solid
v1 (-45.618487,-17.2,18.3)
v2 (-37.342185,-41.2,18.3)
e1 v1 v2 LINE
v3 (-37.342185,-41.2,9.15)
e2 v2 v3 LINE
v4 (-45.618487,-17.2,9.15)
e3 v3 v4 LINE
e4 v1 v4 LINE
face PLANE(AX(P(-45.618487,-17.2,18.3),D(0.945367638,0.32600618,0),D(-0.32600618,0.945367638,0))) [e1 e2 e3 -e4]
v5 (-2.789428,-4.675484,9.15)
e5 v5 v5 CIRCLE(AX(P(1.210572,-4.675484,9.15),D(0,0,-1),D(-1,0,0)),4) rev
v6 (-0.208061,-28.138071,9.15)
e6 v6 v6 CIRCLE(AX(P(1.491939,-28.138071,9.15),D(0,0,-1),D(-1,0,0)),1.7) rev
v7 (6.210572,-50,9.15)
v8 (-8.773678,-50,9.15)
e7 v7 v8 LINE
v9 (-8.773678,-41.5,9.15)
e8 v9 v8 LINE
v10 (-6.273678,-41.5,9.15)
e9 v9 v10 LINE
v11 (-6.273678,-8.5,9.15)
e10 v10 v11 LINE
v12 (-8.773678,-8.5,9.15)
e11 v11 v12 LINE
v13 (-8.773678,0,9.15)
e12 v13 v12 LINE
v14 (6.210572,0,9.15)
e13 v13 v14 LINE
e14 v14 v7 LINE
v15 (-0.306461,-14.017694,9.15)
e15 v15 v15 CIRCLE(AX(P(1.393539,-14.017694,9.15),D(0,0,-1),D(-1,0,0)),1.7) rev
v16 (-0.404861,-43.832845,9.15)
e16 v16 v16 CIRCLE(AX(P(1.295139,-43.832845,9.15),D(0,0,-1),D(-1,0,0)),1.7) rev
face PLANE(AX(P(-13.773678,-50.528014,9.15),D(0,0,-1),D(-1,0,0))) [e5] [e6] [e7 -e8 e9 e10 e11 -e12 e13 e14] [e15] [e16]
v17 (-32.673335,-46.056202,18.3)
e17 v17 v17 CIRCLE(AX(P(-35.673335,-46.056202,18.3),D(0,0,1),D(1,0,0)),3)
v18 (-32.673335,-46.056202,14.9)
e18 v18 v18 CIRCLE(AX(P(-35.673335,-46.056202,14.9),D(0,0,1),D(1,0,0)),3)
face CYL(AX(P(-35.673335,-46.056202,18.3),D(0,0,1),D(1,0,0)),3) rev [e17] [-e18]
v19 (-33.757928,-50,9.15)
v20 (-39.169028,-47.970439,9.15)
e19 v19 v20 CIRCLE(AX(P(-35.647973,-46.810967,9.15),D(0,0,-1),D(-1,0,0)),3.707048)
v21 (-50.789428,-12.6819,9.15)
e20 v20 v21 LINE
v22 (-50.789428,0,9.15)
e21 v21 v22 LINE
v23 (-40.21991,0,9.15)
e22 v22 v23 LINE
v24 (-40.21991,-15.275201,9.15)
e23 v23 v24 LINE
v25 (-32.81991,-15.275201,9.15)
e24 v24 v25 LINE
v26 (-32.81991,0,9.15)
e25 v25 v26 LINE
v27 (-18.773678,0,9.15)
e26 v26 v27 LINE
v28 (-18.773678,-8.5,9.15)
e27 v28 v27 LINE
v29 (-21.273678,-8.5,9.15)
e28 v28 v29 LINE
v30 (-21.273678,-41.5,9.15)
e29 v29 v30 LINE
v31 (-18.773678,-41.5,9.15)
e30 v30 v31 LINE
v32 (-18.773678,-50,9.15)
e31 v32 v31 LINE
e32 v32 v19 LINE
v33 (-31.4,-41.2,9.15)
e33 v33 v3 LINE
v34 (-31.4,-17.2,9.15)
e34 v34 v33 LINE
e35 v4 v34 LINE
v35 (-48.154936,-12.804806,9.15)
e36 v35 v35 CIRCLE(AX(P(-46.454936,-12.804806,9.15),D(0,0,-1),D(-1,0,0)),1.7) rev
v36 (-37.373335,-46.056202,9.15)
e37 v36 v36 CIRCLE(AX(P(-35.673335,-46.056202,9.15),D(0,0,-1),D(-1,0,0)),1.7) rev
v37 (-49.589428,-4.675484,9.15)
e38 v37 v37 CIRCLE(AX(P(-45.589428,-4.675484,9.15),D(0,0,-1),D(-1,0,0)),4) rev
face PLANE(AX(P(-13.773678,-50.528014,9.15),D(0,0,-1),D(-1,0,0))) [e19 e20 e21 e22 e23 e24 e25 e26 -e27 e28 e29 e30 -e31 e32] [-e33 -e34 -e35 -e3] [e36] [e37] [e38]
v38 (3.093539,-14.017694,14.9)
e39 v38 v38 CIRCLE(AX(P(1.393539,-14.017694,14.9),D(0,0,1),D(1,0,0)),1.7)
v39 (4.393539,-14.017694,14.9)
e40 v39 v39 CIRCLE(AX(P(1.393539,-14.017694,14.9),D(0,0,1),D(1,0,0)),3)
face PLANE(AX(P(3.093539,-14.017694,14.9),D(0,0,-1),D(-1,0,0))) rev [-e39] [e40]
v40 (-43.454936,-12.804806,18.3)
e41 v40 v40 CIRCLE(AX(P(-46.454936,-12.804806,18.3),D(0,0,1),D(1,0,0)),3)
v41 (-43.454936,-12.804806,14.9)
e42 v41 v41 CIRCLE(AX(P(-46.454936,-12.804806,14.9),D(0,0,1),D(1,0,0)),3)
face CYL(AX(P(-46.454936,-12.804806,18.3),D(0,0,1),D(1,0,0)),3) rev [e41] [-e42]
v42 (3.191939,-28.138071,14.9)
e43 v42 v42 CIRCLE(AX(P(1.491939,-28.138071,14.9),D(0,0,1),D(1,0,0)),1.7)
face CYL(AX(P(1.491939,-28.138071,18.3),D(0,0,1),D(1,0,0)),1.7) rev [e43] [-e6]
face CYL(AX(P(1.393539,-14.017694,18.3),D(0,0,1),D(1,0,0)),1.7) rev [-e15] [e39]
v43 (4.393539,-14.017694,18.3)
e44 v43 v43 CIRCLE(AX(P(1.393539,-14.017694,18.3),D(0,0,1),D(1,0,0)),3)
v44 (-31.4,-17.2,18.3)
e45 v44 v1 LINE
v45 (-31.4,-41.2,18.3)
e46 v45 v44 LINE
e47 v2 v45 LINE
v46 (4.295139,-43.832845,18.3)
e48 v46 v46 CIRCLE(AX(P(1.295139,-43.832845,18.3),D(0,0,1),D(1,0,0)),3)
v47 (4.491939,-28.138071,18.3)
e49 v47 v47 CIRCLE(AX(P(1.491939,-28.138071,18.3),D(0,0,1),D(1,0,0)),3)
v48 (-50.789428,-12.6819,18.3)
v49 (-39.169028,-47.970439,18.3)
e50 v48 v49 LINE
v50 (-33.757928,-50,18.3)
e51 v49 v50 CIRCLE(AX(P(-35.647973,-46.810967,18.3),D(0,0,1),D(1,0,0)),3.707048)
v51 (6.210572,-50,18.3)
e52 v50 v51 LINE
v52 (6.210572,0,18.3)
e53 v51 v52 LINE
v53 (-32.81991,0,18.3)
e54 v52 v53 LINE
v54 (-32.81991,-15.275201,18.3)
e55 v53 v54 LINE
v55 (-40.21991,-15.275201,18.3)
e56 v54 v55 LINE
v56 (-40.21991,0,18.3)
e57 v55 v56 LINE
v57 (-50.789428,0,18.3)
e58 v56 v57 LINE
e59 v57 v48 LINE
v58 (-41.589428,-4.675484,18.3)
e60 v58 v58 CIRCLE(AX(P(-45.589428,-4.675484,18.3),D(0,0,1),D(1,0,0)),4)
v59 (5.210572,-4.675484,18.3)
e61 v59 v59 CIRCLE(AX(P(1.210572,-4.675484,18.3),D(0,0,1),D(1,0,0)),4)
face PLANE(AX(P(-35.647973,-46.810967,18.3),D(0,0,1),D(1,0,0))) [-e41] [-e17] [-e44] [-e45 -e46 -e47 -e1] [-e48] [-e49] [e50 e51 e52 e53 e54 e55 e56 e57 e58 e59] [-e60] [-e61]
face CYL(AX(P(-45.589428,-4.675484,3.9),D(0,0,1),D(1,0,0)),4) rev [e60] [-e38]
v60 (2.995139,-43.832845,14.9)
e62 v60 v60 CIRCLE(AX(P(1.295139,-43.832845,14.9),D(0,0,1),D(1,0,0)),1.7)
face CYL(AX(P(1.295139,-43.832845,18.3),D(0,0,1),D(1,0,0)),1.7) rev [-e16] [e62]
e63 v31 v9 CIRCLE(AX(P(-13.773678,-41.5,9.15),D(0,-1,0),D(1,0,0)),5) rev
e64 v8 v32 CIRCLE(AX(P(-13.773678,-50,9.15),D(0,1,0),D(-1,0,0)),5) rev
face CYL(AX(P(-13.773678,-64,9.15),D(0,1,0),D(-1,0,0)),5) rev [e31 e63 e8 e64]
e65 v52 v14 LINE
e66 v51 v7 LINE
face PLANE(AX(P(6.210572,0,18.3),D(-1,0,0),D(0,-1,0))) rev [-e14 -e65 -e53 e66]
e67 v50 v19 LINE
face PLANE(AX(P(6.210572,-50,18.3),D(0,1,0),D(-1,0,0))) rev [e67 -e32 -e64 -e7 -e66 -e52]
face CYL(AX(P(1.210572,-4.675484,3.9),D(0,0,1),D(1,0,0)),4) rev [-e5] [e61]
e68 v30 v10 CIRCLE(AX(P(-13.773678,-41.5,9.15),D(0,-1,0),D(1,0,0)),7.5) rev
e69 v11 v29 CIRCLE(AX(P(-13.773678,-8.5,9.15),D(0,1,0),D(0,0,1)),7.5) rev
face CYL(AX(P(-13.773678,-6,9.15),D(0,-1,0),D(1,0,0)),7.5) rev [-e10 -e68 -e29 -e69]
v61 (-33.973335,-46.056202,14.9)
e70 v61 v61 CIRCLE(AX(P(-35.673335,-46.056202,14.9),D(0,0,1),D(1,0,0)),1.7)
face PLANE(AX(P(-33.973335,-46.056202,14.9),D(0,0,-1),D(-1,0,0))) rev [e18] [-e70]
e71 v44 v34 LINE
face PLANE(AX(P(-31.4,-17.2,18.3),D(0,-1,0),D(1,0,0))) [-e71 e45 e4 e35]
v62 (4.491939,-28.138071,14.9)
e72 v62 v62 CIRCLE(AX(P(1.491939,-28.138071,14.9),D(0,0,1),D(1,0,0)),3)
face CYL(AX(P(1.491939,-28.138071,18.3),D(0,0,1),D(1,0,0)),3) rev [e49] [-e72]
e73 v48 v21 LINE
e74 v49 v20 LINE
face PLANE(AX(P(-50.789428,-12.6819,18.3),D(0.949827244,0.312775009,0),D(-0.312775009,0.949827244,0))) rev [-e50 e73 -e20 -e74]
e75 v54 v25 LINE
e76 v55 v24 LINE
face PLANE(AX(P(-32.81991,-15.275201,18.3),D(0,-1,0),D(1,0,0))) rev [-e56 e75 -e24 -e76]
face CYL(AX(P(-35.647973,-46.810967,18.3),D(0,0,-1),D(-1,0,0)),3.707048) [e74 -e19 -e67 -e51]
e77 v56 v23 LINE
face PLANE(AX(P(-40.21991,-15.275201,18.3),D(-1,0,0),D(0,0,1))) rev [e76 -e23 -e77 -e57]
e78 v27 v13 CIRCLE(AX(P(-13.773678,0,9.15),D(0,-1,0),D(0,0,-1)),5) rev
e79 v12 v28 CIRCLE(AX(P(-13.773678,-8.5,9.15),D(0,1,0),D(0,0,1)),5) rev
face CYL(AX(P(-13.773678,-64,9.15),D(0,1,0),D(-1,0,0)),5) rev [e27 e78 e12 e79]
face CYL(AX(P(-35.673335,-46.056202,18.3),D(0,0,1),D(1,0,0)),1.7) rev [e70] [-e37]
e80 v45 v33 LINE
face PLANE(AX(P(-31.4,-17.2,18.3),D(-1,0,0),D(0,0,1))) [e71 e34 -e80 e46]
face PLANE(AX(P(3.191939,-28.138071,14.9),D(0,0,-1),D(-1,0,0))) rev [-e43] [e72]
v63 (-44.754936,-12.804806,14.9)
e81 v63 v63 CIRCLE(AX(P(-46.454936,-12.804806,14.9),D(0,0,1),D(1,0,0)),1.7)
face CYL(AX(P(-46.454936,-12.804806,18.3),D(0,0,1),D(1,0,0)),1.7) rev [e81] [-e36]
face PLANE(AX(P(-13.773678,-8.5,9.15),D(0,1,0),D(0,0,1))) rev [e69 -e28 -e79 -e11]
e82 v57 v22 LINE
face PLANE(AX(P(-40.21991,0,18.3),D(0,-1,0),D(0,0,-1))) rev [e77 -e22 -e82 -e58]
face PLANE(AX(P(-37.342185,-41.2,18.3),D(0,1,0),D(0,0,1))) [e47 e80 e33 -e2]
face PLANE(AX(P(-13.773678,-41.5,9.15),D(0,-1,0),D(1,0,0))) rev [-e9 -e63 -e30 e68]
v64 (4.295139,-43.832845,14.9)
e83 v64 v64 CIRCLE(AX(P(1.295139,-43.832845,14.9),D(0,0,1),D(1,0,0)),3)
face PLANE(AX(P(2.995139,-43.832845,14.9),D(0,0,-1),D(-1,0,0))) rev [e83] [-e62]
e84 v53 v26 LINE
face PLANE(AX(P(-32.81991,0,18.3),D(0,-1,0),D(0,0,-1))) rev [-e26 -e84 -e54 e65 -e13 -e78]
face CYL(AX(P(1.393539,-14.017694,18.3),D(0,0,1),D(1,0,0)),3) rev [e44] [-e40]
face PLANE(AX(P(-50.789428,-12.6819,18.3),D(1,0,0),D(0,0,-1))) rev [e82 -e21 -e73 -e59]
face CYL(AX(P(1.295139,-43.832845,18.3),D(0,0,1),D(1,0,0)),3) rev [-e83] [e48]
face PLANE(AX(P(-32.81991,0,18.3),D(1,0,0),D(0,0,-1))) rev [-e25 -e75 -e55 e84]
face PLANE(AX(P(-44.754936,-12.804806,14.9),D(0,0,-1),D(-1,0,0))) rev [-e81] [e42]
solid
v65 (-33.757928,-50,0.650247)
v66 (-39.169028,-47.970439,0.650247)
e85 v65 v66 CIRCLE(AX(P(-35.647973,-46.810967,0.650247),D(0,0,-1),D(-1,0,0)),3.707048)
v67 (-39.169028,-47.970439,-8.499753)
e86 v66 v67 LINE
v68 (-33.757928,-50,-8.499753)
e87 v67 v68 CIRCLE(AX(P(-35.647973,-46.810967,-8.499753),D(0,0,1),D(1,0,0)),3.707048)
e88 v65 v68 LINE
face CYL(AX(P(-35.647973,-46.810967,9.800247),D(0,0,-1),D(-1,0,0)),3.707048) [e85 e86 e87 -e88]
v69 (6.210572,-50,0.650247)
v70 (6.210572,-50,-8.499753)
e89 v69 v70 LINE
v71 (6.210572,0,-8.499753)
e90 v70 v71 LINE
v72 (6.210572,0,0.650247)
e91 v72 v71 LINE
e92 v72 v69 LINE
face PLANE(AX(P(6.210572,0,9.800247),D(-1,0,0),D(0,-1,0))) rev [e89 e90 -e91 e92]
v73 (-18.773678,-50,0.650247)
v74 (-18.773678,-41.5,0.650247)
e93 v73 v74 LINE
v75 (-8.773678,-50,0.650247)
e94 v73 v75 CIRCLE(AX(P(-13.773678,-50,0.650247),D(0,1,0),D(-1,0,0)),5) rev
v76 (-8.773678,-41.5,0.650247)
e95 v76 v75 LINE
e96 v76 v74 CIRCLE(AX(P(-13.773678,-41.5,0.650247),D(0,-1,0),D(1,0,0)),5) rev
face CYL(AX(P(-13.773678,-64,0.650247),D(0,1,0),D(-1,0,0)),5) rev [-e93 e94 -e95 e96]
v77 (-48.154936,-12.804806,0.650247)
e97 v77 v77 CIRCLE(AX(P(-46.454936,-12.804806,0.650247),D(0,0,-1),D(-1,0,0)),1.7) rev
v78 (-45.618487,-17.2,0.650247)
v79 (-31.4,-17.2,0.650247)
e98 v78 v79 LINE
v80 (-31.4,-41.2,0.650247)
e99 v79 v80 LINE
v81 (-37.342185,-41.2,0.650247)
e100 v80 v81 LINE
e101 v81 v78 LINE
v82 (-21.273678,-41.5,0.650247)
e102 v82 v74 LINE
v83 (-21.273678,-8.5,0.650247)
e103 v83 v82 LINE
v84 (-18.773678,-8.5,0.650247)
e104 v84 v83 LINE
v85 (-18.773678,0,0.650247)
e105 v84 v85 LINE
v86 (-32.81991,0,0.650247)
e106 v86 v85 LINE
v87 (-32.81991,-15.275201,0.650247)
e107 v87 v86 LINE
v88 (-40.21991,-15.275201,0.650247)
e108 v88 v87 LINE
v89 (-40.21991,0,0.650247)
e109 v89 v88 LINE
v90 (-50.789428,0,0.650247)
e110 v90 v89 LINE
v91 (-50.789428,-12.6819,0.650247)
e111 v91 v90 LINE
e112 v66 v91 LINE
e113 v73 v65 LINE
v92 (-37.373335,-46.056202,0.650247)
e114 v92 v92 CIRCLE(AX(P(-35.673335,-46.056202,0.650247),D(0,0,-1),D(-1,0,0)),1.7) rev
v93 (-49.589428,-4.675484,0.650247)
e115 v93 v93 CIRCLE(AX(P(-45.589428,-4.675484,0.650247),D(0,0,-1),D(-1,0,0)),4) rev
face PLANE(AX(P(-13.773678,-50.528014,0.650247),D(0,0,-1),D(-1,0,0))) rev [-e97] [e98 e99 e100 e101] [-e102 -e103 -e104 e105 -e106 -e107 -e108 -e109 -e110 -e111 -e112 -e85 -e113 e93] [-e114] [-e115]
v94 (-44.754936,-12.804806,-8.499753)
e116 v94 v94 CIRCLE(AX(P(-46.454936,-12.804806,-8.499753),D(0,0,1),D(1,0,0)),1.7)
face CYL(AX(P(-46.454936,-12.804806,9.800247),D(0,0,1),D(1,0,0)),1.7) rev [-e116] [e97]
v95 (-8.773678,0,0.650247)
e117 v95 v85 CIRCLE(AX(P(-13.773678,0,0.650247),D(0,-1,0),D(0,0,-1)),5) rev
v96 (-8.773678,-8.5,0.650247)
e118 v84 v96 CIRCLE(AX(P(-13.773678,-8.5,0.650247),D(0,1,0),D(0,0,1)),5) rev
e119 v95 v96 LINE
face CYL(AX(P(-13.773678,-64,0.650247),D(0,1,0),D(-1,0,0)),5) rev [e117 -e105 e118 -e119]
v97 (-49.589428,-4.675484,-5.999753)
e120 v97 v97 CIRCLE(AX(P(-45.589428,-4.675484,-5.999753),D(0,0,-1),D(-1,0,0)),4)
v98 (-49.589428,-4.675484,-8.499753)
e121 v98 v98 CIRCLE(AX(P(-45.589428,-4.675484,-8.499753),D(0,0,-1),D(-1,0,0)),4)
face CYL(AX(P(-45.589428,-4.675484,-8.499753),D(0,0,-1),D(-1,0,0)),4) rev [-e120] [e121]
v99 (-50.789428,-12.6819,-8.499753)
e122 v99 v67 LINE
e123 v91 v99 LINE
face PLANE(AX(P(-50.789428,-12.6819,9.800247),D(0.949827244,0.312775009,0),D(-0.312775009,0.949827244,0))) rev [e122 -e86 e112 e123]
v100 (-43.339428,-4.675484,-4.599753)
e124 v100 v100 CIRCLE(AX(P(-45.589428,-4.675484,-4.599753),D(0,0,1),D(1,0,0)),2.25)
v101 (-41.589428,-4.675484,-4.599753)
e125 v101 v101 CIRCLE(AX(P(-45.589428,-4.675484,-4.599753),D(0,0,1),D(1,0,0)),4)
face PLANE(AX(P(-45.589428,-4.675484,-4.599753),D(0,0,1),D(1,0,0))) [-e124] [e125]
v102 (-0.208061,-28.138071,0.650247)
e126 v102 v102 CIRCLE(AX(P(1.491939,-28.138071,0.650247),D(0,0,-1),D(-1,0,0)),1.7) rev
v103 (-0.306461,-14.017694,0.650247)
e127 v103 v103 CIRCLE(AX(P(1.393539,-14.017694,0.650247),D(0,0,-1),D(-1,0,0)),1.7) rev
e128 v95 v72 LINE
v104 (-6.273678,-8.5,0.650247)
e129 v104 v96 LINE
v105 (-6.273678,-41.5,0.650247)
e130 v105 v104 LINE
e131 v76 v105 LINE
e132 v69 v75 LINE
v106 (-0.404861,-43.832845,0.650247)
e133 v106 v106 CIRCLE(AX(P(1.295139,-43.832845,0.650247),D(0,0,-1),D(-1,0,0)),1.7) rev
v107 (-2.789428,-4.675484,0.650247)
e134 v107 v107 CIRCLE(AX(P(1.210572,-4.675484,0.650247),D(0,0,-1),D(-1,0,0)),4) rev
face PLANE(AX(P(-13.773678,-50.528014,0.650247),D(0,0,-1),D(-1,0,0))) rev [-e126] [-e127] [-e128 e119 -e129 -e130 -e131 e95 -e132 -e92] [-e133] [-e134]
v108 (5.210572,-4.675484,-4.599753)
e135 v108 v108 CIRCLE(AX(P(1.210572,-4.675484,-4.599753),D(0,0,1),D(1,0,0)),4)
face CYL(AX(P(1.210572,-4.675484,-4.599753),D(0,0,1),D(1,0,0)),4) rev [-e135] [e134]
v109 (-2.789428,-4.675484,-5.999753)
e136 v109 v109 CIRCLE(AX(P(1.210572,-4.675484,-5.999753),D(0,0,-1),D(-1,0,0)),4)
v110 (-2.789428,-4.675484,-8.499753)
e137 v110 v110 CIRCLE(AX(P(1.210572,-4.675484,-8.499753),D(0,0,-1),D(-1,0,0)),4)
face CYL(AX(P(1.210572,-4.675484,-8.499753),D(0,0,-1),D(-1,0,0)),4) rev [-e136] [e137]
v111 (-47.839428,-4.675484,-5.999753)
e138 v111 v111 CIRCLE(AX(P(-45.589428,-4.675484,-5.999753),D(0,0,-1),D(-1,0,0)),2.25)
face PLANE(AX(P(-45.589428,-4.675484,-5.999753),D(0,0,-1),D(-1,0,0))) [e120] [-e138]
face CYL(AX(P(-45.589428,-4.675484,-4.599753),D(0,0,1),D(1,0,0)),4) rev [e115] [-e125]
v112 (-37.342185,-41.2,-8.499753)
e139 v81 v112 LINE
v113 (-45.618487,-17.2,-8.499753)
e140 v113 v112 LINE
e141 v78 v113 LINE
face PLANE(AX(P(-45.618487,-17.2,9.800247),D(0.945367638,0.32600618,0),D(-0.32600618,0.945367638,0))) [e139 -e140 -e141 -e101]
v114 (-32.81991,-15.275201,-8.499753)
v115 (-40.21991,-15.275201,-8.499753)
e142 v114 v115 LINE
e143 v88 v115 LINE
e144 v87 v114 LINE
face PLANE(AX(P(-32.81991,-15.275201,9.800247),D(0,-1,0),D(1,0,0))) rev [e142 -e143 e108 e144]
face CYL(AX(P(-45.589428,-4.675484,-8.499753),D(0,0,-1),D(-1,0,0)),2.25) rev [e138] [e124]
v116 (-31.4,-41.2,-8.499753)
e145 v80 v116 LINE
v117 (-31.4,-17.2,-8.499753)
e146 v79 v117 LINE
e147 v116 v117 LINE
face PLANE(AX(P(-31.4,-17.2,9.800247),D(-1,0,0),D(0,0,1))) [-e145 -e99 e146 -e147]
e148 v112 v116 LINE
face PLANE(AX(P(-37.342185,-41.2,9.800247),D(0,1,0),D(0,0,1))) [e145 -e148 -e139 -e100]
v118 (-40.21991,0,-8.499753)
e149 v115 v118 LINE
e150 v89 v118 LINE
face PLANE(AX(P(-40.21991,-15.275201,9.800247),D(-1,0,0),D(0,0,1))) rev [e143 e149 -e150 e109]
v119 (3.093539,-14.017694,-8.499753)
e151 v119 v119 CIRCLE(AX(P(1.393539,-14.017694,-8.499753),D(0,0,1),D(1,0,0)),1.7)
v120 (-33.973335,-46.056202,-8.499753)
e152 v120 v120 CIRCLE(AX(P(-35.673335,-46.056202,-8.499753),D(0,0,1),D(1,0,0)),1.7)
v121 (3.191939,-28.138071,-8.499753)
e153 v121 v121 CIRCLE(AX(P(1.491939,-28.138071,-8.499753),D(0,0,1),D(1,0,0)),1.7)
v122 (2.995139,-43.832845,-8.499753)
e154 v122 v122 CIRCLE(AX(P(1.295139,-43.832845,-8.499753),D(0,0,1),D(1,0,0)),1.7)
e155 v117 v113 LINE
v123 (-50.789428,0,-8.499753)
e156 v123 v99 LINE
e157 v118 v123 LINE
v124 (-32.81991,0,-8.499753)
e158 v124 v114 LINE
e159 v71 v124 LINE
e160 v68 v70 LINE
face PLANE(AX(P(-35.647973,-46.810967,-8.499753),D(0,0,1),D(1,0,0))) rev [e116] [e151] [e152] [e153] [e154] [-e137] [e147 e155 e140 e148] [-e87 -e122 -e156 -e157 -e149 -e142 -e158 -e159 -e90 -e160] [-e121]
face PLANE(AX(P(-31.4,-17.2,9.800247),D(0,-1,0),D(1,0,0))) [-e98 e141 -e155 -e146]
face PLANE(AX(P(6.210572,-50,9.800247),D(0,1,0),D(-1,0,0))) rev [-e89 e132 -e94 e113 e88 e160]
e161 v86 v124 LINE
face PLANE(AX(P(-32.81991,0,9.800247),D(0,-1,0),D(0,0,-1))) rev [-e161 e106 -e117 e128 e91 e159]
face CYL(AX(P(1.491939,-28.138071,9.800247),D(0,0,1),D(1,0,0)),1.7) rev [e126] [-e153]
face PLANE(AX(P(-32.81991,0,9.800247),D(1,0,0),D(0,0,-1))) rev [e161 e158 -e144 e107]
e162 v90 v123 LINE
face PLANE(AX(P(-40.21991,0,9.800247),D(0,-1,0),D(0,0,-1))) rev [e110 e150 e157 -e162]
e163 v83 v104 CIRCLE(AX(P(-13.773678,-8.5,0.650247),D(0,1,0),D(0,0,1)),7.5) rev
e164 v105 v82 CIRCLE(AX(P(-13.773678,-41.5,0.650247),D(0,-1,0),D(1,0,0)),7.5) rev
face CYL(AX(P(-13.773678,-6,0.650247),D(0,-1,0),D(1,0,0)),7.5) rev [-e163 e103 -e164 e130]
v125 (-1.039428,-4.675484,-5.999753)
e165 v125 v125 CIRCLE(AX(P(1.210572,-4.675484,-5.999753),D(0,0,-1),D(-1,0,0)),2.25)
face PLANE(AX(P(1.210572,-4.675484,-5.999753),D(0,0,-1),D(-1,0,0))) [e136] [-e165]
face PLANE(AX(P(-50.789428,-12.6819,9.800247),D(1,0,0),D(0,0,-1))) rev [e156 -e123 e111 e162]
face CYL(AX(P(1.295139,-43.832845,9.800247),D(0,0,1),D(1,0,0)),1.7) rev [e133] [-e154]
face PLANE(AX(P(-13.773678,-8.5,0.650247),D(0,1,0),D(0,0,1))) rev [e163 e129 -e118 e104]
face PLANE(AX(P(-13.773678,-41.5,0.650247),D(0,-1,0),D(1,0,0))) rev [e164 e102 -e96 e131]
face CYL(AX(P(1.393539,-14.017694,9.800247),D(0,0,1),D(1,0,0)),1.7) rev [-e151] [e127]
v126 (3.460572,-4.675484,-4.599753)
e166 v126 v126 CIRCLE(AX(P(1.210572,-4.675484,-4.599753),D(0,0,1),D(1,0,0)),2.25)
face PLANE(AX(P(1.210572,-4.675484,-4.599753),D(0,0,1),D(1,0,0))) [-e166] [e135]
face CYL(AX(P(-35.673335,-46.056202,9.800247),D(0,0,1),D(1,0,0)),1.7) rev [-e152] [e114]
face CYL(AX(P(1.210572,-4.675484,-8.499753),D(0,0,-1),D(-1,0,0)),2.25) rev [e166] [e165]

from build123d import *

# Parameters (mm, degrees)
EXTRUDE_1_DEPTH                = 18.3
HOLE_WIZARD_M4_9_OUTLINE_R     = 2.25
HOLE_WIZARD_M4_9_DEPTH         = 18.3
HOLE_WIZARD_M4_9_2_OUTLINE_R   = 4
HOLE_WIZARD_M4_9_2_OUTLINE_R_2 = 2.25
HOLE_WIZARD_M4_9_2_DEPTH       = 4.6
EXTRUDE_START                  = -14.8
SKETCH_10_R                    = 4
SKETCH_10_R_2                  = 2.25
EXTRUDE_3_DEPTH                = 14.8
EXTRUDE_START_2                = -14
SKETCH_10_3_R                  = 4
SKETCH_10_3_R_2                = 2.25
EXTRUDE_4_DEPTH                = 14
SKETCH_10_4_R                  = 4
SKETCH_10_4_R_2                = 2.25
EXTRUDE_5_DEPTH                = 14.4
EXTRUDE_5_2_DEPTH              = 14.4
EXTRUDE_START_3                = 1
SKETCH_12_R                    = 4
SKETCH_12_R_2                  = 2.25
EXTRUDE_6_DEPTH                = 1
HOLE_WIZARD_M3_1_D             = 3.4
HOLE_WIZARD_M3_1_CBORE_D       = 6
HOLE_WIZARD_M3_1_CBORE_DEPTH   = 3.4
SKETCH_15_R                    = 7.5
EXTRUDE_7_DEPTH                = 44
EXTRUDE_8_DEPTH                = 14
EXTRUDE_8_DEPTH_BACK           = 75
SKETCH_15_2_R                  = 7.5
SKETCH_15_3_R                  = 7.5
EXTRUDE_9_DEPTH                = 8.5
EXTRUDE_START_4                = -8.5
SKETCH_16_R                    = 7.5
EXTRUDE_10_DEPTH               = 8.5
EXTRUDE_11_DEPTH               = 14
EXTRUDE_11_DEPTH_BACK          = 67.5
SKETCH_17_R                    = 5
SPLIT_BODIES_1_SURFACE_1_BACK  = 79.332
SPLIT_BODIES_1_SURFACE_1_DEPTH = 158.664
SPLIT_BODIES_1_SURFACE_2_BACK  = 79.332
SPLIT_BODIES_1_SURFACE_2_DEPTH = 158.664


with BuildPart() as part:
    # 草图1 → 凸台-拉伸1 (new body)
    with BuildSketch(Plane.XY):
        with BuildLine():
            Line((0, -50), (-33.757928075, -50))
            ThreePointArc((-33.757928075, -50), (-36.949828603, -50.281899468), (-39.169027754, -47.970438583))
            Line((-39.169027754, -47.970438583), (-50.789428367, -12.681899647))
            Line((-50.789428367, -12.681899647), (-50.789428367, 0))
            Line((-50.789428367, 0), (-40.21990991, 0))
            Line((-40.21990991, 0), (-40.21990991, -15.275201138))
            Line((-40.21990991, -15.275201138), (-32.81990991, -15.275201138))
            Line((-32.81990991, -15.275201138), (-32.81990991, 0))
            Line((-32.81990991, 0), (0, 0))
            Line((0, 0), (6.210571633, 0))
            Line((6.210571633, 0), (6.210571633, -50))
            Line((6.210571633, -50), (0, -50))
        make_face()
        Polygon((-31.4, -17.2), (-31.4, -41.2), (-37.342185184, -41.2), (-45.618487459, -17.2), align=None, mode=Mode.SUBTRACT)
    extrude(amount=EXTRUDE_1_DEPTH)

    # M4 六角圆柱头螺钉的柱形沉头孔9: read off the stored shape, not the designer's step
    # M4 六角圆柱头螺钉的柱形沉头孔9 outline → M4 六角圆柱头螺钉的柱形沉头孔9 (cut)
    with BuildSketch(Plane.XY):
        with Locations((1.210571633, -4.675484087)):
            Circle(HOLE_WIZARD_M4_9_OUTLINE_R)
        with Locations((-45.589428367, -4.675484087)):
            Circle(HOLE_WIZARD_M4_9_OUTLINE_R)
    extrude(amount=HOLE_WIZARD_M4_9_DEPTH, mode=Mode.SUBTRACT)

    # Hole Wizard M4 _9 2 outline → Hole Wizard M4 _9 2 (cut)
    # profile 1 of 2: a face of its own
    with BuildSketch(Plane.XY):
        with Locations((1.210571633, -4.675484087)):
            Circle(HOLE_WIZARD_M4_9_2_OUTLINE_R)
        with Locations((1.210571633, -4.675484087)):
            Circle(HOLE_WIZARD_M4_9_2_OUTLINE_R_2, mode=Mode.SUBTRACT)
    # profile 2 of 2: a face of its own
    with BuildSketch(Plane.XY):
        with Locations((-45.589428367, -4.675484087)):
            Circle(HOLE_WIZARD_M4_9_2_OUTLINE_R)
        with Locations((-45.589428367, -4.675484087)):
            Circle(HOLE_WIZARD_M4_9_2_OUTLINE_R_2, mode=Mode.SUBTRACT)
    extrude(amount=HOLE_WIZARD_M4_9_2_DEPTH, mode=Mode.SUBTRACT)

    # 草图10 → 凸台-拉伸3 (add)
    # profile 1 of 2: a face of its own
    with BuildSketch(Plane.XY.offset(18.3).offset(EXTRUDE_START)):
        with Locations(Location((-45.589428367, -4.675484087, 0), (0, 0, 180))):
            Circle(SKETCH_10_R)
        with Locations(Location((-45.589428367, -4.675484087, 0), (0, 0, 180))):
            Circle(SKETCH_10_R_2, mode=Mode.SUBTRACT)
    # profile 2 of 2: a face of its own
    with BuildSketch(Plane.XY.offset(18.3).offset(EXTRUDE_START)):
        with Locations(Location((1.210571633, -4.675484087, 0), (0, 0, 180))):
            Circle(SKETCH_10_R)
        with Locations(Location((1.210571633, -4.675484087, 0), (0, 0, 180))):
            Circle(SKETCH_10_R_2, mode=Mode.SUBTRACT)
    extrude(amount=EXTRUDE_3_DEPTH)

    # 草图10<3> → 凸台-拉伸4 (add)
    # profile 1 of 2: a face of its own
    with BuildSketch(Plane.XY.offset(18.3).offset(EXTRUDE_START_2)):
        with Locations(Location((-45.589428367, -4.675484087, 0), (0, 0, 180))):
            Circle(SKETCH_10_3_R)
        with Locations(Location((-45.589428367, -4.675484087, 0), (0, 0, 180))):
            Circle(SKETCH_10_3_R_2, mode=Mode.SUBTRACT)
    # profile 2 of 2: a face of its own
    with BuildSketch(Plane.XY.offset(18.3).offset(EXTRUDE_START_2)):
        with Locations(Location((1.210571633, -4.675484087, 0), (0, 0, 180))):
            Circle(SKETCH_10_3_R)
        with Locations(Location((1.210571633, -4.675484087, 0), (0, 0, 180))):
            Circle(SKETCH_10_3_R_2, mode=Mode.SUBTRACT)
    extrude(amount=EXTRUDE_4_DEPTH)


with BuildPart() as body_2:
    # 草图10<4> → 凸台-拉伸5 (new body)
    with BuildSketch(Plane.XY.offset(18.3)):
        with Locations((-45.589428367, -4.675484087)):
            Circle(SKETCH_10_4_R)
        with Locations((-45.589428367, -4.675484087)):
            Circle(SKETCH_10_4_R_2, mode=Mode.SUBTRACT)
    extrude(amount=-EXTRUDE_5_DEPTH)


with BuildPart() as body_3:
    # 草图10<4> → Extrude 5 2 (new body)
    with BuildSketch(Plane.XY.offset(18.3)):
        with Locations((1.210571633, -4.675484087)):
            Circle(SKETCH_10_4_R)
        with Locations((1.210571633, -4.675484087)):
            Circle(SKETCH_10_4_R_2, mode=Mode.SUBTRACT)
    extrude(amount=-EXTRUDE_5_2_DEPTH)


with BuildPart() as part_1:
    add(part.part)

    # Combine 1: cut body 3, body 2
    add(body_3.part, mode=Mode.SUBTRACT)
    add(body_2.part, mode=Mode.SUBTRACT)

    # 草图12 → 凸台-拉伸6 (add)
    # profile 1 of 2: a face of its own
    with BuildSketch(Plane(origin=(0, 0, 3.5), x_dir=(-1, 0, 0), z_dir=(0, 0, -1)).offset(EXTRUDE_START_3)):
        with Locations((-1.210571633, -4.675484087)):
            Circle(SKETCH_12_R)
        with Locations((-1.210571633, -4.675484087)):
            Circle(SKETCH_12_R_2, mode=Mode.SUBTRACT)
    # profile 2 of 2: a face of its own
    with BuildSketch(Plane(origin=(0, 0, 3.5), x_dir=(-1, 0, 0), z_dir=(0, 0, -1)).offset(EXTRUDE_START_3)):
        with Locations((45.589428367, -4.675484087)):
            Circle(SKETCH_12_R)
        with Locations((45.589428367, -4.675484087)):
            Circle(SKETCH_12_R_2, mode=Mode.SUBTRACT)
    extrude(amount=-EXTRUDE_6_DEPTH)

    # M3 六角圆柱头螺钉的柱形沉头孔1 (through all)
    with Locations(Plane(origin=(-35.673334908, -46.056201731, 18.3), x_dir=(1, 0, 0), z_dir=(0, 0, 1))):
        with Locations((0, 0), (-10.781600809, 33.251395545), (37.066874077, 32.038507969), (37.165273915, 17.918131222), (36.968474239, 2.223357068)):
            CounterBoreHole(HOLE_WIZARD_M3_1_D / 2, HOLE_WIZARD_M3_1_CBORE_D / 2, HOLE_WIZARD_M3_1_CBORE_DEPTH)


with BuildPart() as body_2_2:
    # 草图15 → 凸台-拉伸7 (new body)
    with BuildSketch(Plane.XZ.offset(50)):
        with Locations((-13.773678221, 9.15)):
            Circle(SKETCH_15_R)
    extrude(amount=-EXTRUDE_7_DEPTH)


with BuildPart() as part_2:
    add(part_1.part)

    # Combine 2: cut body 2 2
    add(body_2_2.part, mode=Mode.SUBTRACT)


with BuildPart() as body_2_3:
    # 草图15<2> → 凸台-拉伸8 (new, two sides: drawn at the far end of the back side and taken through both)
    with BuildSketch(Plane.XZ.offset(50).offset(-EXTRUDE_8_DEPTH_BACK)):
        with Locations((-13.773678221, 9.15)):
            Circle(SKETCH_15_2_R)
    extrude(amount=EXTRUDE_8_DEPTH + EXTRUDE_8_DEPTH_BACK)


with BuildPart() as part_3:
    add(part_2.part)

    # Combine 3: cut body 2 3
    add(body_2_3.part, mode=Mode.SUBTRACT)

    # 草图15<3> → 凸台-拉伸9 (add)
    with BuildSketch(Plane.XZ.offset(50)):
        with Locations((-13.773678221, 9.15)):
            Circle(SKETCH_15_3_R)
    extrude(amount=-EXTRUDE_9_DEPTH)

    # 草图16 → 凸台-拉伸10 (add)
    with BuildSketch(Plane(origin=(0, 0, 0), x_dir=(1, 0, 0), z_dir=(0, 1, 0)).offset(EXTRUDE_START_4)):
        with Locations((-13.773678221, -9.15)):
            Circle(SKETCH_16_R)
    extrude(amount=EXTRUDE_10_DEPTH)


with BuildPart() as body_2_4:
    # 草图17 → 凸台-拉伸11 (new, two sides: drawn at the far end of the back side and taken through both)
    with BuildSketch(Plane.XZ.offset(50).offset(-EXTRUDE_11_DEPTH_BACK)):
        with Locations((-13.773678221, 9.15)):
            Circle(SKETCH_17_R)
    extrude(amount=EXTRUDE_11_DEPTH + EXTRUDE_11_DEPTH_BACK)


with BuildPart() as part_4:
    add(part_3.part)

    # Combine 4: cut body 2 4
    add(body_2_4.part, mode=Mode.SUBTRACT)


with BuildPart() as body_2_5:
    # Split Bodies 1: the piece behind the surface
    add(part_4.part)
    # Split Bodies 1 surface: a surface, the sketch's curves swept straight by 158.664 mm
    with BuildLine(Plane(origin=(0, 0, 0), x_dir=(1, 0, 0), z_dir=(0, 1, 0)).offset(-SPLIT_BODIES_1_SURFACE_1_BACK), mode=Mode.PRIVATE) as split_bodies_1_surface_1_path:
        Line((17.739659473, -9.15), (-13.773678221, -9.15))
        Line((-13.773678221, -9.15), (-56.906947056, -9.15))
    split_bodies_1_surface_1 = Shell.extrude(split_bodies_1_surface_1_path.wire(), (0 * SPLIT_BODIES_1_SURFACE_1_DEPTH, 1 * SPLIT_BODIES_1_SURFACE_1_DEPTH, 0 * SPLIT_BODIES_1_SURFACE_1_DEPTH))
    split(bisect_by=split_bodies_1_surface_1, keep=Keep.BOTTOM)


with BuildPart() as part_5:
    add(part_4.part)

    # Split Bodies 1: split by a surface, the side it looks to stays
    # Split Bodies 1 surface: a surface, the sketch's curves swept straight by 158.664 mm
    with BuildLine(Plane(origin=(0, 0, 0), x_dir=(1, 0, 0), z_dir=(0, 1, 0)).offset(-SPLIT_BODIES_1_SURFACE_2_BACK), mode=Mode.PRIVATE) as split_bodies_1_surface_2_path:
        Line((17.739659473, -9.15), (-13.773678221, -9.15))
        Line((-13.773678221, -9.15), (-56.906947056, -9.15))
    split_bodies_1_surface_2 = Shell.extrude(split_bodies_1_surface_2_path.wire(), (0 * SPLIT_BODIES_1_SURFACE_2_DEPTH, 1 * SPLIT_BODIES_1_SURFACE_2_DEPTH, 0 * SPLIT_BODIES_1_SURFACE_2_DEPTH))
    split(bisect_by=split_bodies_1_surface_2, keep=Keep.TOP)


with BuildPart() as body_2_5_1:
    # Move Body 1: read off the stored shape, not the designer's step
    # Move Body 1: moved
    add(body_2_5.part.moved(Location((0, 0, -8.4997527))))


solid = Compound([part_5.part, body_2_5_1.part])
